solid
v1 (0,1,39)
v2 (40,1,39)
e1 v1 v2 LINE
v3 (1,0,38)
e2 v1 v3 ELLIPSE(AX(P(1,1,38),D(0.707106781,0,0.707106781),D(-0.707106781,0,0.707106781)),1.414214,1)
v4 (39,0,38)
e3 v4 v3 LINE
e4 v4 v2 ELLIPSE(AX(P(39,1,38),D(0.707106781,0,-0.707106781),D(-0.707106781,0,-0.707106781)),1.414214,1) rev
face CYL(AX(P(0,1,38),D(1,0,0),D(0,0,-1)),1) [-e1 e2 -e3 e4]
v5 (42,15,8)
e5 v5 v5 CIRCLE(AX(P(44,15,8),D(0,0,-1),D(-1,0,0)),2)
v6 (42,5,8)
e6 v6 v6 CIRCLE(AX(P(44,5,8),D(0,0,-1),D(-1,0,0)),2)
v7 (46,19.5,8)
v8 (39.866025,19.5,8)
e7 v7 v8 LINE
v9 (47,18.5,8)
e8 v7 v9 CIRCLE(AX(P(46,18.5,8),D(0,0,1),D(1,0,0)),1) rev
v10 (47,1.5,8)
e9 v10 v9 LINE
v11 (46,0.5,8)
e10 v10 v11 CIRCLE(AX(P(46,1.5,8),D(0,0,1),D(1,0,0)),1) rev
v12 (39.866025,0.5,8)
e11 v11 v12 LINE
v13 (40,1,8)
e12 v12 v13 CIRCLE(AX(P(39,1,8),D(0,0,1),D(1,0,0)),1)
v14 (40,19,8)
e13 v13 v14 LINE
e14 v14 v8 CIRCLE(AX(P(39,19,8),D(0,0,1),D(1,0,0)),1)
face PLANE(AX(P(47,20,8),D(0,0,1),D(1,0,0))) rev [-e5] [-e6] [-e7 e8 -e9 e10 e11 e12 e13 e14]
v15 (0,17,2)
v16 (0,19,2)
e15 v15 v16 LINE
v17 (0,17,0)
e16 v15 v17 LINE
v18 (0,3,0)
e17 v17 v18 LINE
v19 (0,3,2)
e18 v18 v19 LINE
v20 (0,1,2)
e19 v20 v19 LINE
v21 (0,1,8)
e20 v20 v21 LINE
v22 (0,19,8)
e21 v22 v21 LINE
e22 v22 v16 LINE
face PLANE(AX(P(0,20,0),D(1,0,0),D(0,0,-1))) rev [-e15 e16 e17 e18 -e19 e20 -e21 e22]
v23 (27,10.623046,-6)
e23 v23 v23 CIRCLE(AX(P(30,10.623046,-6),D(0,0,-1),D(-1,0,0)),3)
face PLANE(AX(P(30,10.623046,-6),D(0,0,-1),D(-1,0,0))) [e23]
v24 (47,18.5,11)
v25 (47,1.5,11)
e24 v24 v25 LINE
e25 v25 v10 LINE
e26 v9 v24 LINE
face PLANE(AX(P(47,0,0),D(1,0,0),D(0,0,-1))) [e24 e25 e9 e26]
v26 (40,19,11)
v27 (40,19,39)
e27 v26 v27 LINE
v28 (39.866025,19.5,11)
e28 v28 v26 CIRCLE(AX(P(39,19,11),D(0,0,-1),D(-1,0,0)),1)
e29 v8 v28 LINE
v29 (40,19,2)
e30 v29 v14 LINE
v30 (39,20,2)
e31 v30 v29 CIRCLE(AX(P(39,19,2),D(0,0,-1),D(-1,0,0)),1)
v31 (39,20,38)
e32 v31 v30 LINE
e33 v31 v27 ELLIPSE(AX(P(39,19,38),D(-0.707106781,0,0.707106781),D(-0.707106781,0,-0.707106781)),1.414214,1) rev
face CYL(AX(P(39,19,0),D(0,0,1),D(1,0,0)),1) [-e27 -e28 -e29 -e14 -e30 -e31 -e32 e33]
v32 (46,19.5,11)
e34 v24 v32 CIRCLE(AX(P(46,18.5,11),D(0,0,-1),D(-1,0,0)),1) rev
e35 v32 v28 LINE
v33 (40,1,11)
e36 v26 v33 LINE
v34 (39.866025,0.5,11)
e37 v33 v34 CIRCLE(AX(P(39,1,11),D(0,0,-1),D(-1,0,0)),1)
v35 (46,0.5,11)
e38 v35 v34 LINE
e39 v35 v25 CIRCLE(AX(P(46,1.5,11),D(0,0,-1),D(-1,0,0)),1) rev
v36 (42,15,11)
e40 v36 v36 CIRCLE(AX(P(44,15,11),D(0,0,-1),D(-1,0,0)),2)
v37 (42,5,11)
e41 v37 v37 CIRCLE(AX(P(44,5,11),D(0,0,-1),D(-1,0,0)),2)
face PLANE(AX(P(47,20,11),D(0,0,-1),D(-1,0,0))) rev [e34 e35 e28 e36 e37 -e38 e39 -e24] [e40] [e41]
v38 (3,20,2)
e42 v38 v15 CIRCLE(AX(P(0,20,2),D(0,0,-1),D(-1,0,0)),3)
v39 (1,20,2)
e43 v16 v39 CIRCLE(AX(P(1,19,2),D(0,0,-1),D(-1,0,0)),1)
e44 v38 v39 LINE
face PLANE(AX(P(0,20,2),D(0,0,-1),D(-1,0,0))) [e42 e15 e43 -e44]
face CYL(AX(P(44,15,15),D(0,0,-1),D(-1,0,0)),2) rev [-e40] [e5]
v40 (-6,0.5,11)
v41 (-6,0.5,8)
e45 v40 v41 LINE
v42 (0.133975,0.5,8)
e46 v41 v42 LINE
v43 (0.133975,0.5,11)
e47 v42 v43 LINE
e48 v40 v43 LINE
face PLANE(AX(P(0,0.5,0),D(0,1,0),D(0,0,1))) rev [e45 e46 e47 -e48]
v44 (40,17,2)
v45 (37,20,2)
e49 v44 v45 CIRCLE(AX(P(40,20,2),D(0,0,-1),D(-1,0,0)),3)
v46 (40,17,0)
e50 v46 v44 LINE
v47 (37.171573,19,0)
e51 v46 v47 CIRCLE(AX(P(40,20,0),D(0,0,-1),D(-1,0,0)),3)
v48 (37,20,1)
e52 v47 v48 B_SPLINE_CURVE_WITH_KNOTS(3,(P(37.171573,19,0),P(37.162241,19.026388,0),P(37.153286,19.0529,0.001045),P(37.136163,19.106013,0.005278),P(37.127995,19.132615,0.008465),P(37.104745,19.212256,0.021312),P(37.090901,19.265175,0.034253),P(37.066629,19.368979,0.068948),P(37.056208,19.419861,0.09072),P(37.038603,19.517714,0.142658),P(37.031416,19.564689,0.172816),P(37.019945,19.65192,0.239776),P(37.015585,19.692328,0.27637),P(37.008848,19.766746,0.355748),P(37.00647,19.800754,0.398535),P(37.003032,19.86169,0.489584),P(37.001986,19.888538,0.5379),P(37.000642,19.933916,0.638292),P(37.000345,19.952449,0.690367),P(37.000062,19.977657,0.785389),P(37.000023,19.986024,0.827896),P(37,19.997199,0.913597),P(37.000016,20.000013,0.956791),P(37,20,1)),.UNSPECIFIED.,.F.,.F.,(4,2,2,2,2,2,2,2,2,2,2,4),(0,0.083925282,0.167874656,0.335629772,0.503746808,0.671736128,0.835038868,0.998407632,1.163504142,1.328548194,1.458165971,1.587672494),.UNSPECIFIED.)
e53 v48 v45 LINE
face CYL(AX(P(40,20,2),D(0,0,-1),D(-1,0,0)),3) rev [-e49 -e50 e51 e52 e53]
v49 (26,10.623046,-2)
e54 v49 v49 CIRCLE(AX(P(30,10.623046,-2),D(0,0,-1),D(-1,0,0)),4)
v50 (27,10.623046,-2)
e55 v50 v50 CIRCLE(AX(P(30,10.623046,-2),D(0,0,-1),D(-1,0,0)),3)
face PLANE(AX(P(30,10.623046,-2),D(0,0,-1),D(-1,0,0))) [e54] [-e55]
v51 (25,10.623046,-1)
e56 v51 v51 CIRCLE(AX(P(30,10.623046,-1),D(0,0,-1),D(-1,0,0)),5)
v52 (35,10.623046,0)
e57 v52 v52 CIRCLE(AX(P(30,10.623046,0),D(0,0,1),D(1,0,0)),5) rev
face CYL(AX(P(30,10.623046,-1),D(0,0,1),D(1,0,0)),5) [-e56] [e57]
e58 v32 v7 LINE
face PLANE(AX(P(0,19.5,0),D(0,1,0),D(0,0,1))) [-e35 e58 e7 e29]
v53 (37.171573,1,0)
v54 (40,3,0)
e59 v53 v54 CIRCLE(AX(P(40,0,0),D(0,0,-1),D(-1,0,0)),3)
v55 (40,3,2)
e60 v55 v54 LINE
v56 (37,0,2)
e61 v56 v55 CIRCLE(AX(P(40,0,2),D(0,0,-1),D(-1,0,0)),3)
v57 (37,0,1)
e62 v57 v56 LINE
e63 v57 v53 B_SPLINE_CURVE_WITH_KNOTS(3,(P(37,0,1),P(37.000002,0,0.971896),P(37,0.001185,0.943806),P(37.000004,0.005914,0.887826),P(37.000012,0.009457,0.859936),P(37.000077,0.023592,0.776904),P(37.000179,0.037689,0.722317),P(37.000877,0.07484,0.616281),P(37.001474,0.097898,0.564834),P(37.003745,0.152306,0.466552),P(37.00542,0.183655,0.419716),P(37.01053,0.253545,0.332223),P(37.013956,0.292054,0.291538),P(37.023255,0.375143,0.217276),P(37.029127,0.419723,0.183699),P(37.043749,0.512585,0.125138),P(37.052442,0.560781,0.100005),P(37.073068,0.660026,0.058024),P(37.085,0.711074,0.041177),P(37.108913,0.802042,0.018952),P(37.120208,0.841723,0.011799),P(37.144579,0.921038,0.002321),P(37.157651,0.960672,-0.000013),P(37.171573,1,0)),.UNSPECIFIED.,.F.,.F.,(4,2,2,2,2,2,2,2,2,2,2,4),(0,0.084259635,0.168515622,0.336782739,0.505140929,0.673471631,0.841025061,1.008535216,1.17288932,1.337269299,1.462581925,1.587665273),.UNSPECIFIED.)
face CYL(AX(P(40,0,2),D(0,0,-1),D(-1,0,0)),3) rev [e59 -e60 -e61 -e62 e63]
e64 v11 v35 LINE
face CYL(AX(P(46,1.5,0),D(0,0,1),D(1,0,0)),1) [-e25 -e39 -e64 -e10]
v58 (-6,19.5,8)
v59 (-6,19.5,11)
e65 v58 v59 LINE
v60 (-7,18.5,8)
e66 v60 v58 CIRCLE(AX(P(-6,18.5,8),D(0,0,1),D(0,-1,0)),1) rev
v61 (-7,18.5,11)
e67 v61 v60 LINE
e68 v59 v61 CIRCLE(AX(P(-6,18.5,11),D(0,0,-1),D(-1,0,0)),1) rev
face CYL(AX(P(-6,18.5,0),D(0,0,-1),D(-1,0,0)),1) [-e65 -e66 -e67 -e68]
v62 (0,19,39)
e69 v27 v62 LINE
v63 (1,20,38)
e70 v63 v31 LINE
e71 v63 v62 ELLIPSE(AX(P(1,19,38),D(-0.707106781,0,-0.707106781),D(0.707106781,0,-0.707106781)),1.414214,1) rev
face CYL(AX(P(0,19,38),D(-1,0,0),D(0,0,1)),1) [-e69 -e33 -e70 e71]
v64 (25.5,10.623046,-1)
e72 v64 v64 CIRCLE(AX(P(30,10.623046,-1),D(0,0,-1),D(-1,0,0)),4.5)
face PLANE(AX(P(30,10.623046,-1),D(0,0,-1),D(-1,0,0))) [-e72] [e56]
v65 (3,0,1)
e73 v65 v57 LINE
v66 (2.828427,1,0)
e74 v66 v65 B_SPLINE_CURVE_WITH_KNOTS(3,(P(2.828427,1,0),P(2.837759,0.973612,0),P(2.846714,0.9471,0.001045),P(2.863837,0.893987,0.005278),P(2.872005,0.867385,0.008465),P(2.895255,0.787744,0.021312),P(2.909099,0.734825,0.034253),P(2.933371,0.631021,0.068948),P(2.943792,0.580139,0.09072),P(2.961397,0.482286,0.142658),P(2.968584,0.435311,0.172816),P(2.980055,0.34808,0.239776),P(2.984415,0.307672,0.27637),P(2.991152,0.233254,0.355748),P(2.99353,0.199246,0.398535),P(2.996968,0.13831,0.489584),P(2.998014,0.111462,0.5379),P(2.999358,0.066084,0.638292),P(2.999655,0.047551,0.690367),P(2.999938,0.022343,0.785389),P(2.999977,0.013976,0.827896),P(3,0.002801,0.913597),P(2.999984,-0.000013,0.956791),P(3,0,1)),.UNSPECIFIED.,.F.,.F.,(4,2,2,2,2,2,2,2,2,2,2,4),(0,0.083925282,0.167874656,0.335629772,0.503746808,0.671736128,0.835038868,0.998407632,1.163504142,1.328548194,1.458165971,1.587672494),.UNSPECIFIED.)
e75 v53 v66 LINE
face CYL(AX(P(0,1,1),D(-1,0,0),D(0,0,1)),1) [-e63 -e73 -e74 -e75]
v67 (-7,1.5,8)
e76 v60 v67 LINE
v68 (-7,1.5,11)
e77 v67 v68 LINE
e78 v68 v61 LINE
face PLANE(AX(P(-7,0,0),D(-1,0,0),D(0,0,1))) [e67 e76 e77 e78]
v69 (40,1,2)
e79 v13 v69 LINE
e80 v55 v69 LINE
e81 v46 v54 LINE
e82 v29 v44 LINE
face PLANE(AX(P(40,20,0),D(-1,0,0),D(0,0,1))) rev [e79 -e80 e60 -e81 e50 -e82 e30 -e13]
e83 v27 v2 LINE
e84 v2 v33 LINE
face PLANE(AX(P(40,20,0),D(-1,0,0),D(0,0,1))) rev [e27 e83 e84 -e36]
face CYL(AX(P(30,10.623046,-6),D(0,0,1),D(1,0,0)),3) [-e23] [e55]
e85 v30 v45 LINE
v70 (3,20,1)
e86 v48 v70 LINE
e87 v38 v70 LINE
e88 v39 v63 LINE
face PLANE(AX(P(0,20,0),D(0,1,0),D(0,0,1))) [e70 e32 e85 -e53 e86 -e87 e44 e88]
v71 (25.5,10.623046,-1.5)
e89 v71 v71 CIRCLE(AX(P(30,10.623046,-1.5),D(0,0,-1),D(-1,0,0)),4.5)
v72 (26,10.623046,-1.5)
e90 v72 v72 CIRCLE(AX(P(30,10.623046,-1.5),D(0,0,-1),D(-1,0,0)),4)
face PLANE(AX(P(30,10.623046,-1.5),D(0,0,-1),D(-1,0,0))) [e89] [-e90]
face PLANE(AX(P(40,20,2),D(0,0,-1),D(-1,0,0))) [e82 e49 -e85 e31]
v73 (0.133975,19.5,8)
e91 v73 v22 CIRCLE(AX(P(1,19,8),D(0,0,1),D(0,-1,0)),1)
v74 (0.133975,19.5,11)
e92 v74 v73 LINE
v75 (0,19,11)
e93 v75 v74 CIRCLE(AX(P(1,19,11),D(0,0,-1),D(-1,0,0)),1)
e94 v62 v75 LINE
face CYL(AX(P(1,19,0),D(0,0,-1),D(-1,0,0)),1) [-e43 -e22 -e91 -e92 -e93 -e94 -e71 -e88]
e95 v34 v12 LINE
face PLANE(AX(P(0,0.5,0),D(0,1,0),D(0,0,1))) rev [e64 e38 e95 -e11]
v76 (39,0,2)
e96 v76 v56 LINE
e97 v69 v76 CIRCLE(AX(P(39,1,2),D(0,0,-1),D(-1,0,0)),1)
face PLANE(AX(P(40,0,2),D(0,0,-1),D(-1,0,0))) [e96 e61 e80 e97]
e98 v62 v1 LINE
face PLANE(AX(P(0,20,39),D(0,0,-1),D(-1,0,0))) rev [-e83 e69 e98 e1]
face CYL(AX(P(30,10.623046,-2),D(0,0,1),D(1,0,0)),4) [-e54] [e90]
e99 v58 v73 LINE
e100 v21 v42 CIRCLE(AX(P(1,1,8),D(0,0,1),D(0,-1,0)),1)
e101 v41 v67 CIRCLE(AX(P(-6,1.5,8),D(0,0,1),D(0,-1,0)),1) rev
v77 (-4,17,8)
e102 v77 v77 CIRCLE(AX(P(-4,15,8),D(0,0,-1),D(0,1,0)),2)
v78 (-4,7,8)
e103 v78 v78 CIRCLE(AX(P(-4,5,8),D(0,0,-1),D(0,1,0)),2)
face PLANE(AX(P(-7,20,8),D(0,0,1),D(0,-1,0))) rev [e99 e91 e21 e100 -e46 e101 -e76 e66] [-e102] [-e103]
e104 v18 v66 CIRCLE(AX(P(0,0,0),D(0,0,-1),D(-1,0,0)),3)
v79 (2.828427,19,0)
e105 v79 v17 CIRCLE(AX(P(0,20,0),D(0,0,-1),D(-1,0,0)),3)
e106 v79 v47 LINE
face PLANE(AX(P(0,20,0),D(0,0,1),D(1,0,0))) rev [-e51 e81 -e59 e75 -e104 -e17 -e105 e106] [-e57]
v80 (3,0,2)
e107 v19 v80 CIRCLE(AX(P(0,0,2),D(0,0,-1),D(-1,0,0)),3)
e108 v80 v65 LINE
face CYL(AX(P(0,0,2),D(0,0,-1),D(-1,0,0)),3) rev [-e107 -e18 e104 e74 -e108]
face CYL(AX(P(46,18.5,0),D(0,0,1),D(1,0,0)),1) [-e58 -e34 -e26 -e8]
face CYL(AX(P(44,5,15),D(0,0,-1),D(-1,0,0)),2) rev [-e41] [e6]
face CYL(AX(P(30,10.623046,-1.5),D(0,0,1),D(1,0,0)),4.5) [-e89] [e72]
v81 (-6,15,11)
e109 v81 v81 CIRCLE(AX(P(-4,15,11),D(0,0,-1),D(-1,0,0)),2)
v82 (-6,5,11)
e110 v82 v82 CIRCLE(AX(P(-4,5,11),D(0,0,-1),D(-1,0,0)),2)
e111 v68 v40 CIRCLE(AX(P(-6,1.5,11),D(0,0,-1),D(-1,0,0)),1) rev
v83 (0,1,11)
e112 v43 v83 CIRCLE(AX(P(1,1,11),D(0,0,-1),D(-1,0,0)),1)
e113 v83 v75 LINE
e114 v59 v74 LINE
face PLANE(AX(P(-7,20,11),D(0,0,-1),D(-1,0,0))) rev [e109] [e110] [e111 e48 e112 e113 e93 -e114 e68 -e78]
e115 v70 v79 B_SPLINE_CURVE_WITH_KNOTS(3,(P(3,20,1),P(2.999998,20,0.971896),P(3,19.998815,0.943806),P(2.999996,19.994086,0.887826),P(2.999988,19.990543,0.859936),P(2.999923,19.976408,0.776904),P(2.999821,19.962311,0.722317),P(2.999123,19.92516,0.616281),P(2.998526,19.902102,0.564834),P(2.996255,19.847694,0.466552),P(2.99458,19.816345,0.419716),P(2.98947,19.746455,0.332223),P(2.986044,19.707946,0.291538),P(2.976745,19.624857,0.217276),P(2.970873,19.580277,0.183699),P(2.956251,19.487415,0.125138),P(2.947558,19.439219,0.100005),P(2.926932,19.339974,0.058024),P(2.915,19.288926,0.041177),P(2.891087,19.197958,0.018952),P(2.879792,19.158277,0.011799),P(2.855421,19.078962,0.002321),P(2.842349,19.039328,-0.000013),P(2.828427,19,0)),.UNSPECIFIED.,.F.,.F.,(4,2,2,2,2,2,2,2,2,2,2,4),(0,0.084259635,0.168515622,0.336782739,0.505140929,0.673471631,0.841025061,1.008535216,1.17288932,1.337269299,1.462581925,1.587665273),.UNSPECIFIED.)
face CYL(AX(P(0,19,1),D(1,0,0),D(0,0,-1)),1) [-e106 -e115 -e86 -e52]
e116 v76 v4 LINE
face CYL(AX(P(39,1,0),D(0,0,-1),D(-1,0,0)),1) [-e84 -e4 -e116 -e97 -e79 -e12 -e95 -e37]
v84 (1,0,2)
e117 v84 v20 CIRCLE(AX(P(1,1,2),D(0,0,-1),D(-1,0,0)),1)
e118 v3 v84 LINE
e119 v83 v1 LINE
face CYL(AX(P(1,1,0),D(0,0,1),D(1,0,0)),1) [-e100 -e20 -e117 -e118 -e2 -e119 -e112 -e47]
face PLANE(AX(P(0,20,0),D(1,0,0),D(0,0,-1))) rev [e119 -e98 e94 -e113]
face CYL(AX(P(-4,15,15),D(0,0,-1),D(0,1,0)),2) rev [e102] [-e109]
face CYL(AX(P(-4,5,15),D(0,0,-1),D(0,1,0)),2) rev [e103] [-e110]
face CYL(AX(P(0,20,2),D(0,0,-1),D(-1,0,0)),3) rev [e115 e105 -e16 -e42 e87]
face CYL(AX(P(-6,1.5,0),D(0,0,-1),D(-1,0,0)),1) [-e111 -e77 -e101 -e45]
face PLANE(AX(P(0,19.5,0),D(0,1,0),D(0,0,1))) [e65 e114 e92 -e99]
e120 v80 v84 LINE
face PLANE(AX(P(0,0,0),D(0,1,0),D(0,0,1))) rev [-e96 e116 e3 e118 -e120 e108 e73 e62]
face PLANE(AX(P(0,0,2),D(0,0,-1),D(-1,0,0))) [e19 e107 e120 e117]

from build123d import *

# Parameters (mm, degrees)
SKETCH_1_W               = 40
SKETCH_1_H               = 39
EXTRUDE_1_DEPTH          = 20
SKETCH_6_R               = 5
EXTRUDE_3_DEPTH          = 1
SKETCH_7_R               = 4.5
EXTRUDE_4_DEPTH          = 0.5
SKETCH_8_R               = 4
EXTRUDE_5_DEPTH          = 0.5
SKETCH_9_R               = 3
EXTRUDE_6_DEPTH          = 4
SKETCH_11_W              = 3
SKETCH_11_H              = 20
EXTRUDE_7_DEPTH          = 7
SKETCH_12_R              = 2
CUT_EXTRUDE_2_DEPTH      = 7
SKETCH_13_W              = 3
SKETCH_13_H              = 20
EXTRUDE_8_DEPTH          = 7
SKETCH_14_R              = 2
CUT_EXTRUDE_3_DEPTH      = 7
SKETCH_15_R              = 3
CUT_EXTRUDE_4_DEPTH      = 2
CUT_EXTRUDE_6_DEPTH      = 65.265076052
CUT_EXTRUDE_6_DEPTH_BACK = 0.5
CUT_EXTRUDE_7_DEPTH      = 65.265076052
CUT_EXTRUDE_7_DEPTH_BACK = 0.5
CUT_EXTRUDE_8_DEPTH      = 65.265076052
CUT_EXTRUDE_8_DEPTH_BACK = 0.5
CUT_EXTRUDE_9_DEPTH      = 65.265076052
CUT_EXTRUDE_9_DEPTH_BACK = 0.5
FILLET_3_R               = 1


with BuildPart() as part:
    # 草图1 → 凸台-拉伸1 (new body)
    with BuildSketch(Plane(origin=(0, 0, 0), x_dir=(1, 0, 0), z_dir=(0, 1, 0))):
        with Locations((20, -19.5)):
            Rectangle(SKETCH_1_W, SKETCH_1_H)
    extrude(amount=EXTRUDE_1_DEPTH)

    # 草图6 → 凸台-拉伸3 (add)
    with BuildSketch(Plane(origin=(0, 0, 0), x_dir=(-1, 0, 0), z_dir=(0, 0, -1))):
        with Locations(Location((-30, 10.62304624, 0), (0, 0, 180))):
            Circle(SKETCH_6_R)
    extrude(amount=EXTRUDE_3_DEPTH)

    # 草图7 → 凸台-拉伸4 (add)
    with BuildSketch(Plane(origin=(0, 0, -1), x_dir=(-1, 0, 0), z_dir=(0, 0, -1))):
        with Locations((-30, 10.62304624)):
            Circle(SKETCH_7_R)
    extrude(amount=EXTRUDE_4_DEPTH)

    # 草图8 → 凸台-拉伸5 (add)
    with BuildSketch(Plane(origin=(0, 0, -1.5), x_dir=(-1, 0, 0), z_dir=(0, 0, -1))):
        with Locations((-30, 10.62304624)):
            Circle(SKETCH_8_R)
    extrude(amount=EXTRUDE_5_DEPTH)

    # 草图9 → 凸台-拉伸6 (add)
    with BuildSketch(Plane(origin=(0, 0, -2), x_dir=(-1, 0, 0), z_dir=(0, 0, -1))):
        with Locations((-30, 10.62304624)):
            Circle(SKETCH_9_R)
    extrude(amount=EXTRUDE_6_DEPTH)

    # 草图11 → 凸台-拉伸7 (add)
    with BuildSketch(Plane(origin=(40, 0, 0), x_dir=(0, 0, -1), z_dir=(1, 0, 0))):
        with Locations((-9.5, 10)):
            Rectangle(SKETCH_11_W, SKETCH_11_H)
    extrude(amount=EXTRUDE_7_DEPTH)

    # 草图12 → 切除-拉伸2 (cut)
    with BuildSketch(Plane(origin=(0, 0, 8), x_dir=(-1, 0, 0), z_dir=(0, 0, -1))):
        with Locations((-44, 15)):
            Circle(SKETCH_12_R)
        with Locations((-44, 5)):
            Circle(SKETCH_12_R)
    extrude(amount=-CUT_EXTRUDE_2_DEPTH, mode=Mode.SUBTRACT)

    # 草图13 → 凸台-拉伸8 (add)
    with BuildSketch(Plane.ZY):
        with Locations((9.5, 10)):
            Rectangle(SKETCH_13_W, SKETCH_13_H)
    extrude(amount=EXTRUDE_8_DEPTH)

    # 草图14 → 切除-拉伸3 (cut)
    with BuildSketch(Plane(origin=(0, 0, 8), x_dir=(-1, 0, 0), z_dir=(0, 0, -1))):
        with Locations(Location((4, 15, 0), (0, 0, 90))):
            Circle(SKETCH_14_R)
        with Locations(Location((4, 5, 0), (0, 0, 90))):
            Circle(SKETCH_14_R)
    extrude(amount=-CUT_EXTRUDE_3_DEPTH, mode=Mode.SUBTRACT)

    # 草图15 → 切除-拉伸4 (cut)
    with BuildSketch(Plane(origin=(0, 0, 0), x_dir=(-1, 0, 0), z_dir=(0, 0, -1))):
        with Locations((-40, 20)):
            Circle(SKETCH_15_R)
        with Locations((0, 20)):
            Circle(SKETCH_15_R)
        Circle(SKETCH_15_R)
        with Locations((-40, 0)):
            Circle(SKETCH_15_R)
    extrude(amount=-CUT_EXTRUDE_4_DEPTH, mode=Mode.SUBTRACT)

    # 草图16 → 切除-拉伸6 (cut, two sides: drawn at the far end of the back side and taken through both)
    with BuildSketch(Plane(origin=(0, 20, 0), x_dir=(1, 0, 0), z_dir=(0, 1, 0)).offset(-CUT_EXTRUDE_6_DEPTH_BACK)):
        Polygon((0, 114.605506082), (0, -8), (0, -11), (0, -133.605506082), (-245.211012164, -133.605506082), (-245.211012164, 114.605506082), align=None)
    extrude(amount=CUT_EXTRUDE_6_DEPTH + CUT_EXTRUDE_6_DEPTH_BACK, mode=Mode.SUBTRACT)

    # 草图17 → 切除-拉伸7 (cut, two sides: drawn at the far end of the back side and taken through both)
    with BuildSketch(Plane(origin=(0, 20, 0), x_dir=(1, 0, 0), z_dir=(0, 1, 0)).offset(-CUT_EXTRUDE_7_DEPTH_BACK)):
        Polygon((40, 114.605506082), (40, -8), (40, -11), (40, -133.605506082), (285.211012164, -133.605506082), (285.211012164, 114.605506082), align=None)
    extrude(amount=CUT_EXTRUDE_7_DEPTH + CUT_EXTRUDE_7_DEPTH_BACK, mode=Mode.SUBTRACT)

    # 草图19 → 切除-拉伸8 (cut, two sides: drawn at the far end of the back side and taken through both)
    with BuildSketch(Plane.XZ.offset(-CUT_EXTRUDE_8_DEPTH_BACK)):
        Polygon((0, 133.605506082), (0, 11), (0, 8), (0, -114.605506082), (-245.211012164, -114.605506082), (-245.211012164, 133.605506082), align=None)
    extrude(amount=CUT_EXTRUDE_8_DEPTH + CUT_EXTRUDE_8_DEPTH_BACK, mode=Mode.SUBTRACT)

    # 草图20 → 切除-拉伸9 (cut, two sides: drawn at the far end of the back side and taken through both)
    with BuildSketch(Plane.XZ.offset(-CUT_EXTRUDE_9_DEPTH_BACK)):
        Polygon((40, 133.605506082), (40, 11), (40, 8), (40, -114.605506082), (285.211012164, -114.605506082), (285.211012164, 133.605506082), align=None)
    extrude(amount=CUT_EXTRUDE_9_DEPTH + CUT_EXTRUDE_9_DEPTH_BACK, mode=Mode.SUBTRACT)

    # 圆角3
    # the kernel refuses this fillet: 1 mm, written as the material it takes off along each edge
    with BuildSketch(Plane(origin=(42.5, 0, 39), x_dir=(0, 1, 0), z_dir=(-1, 0, 0))) as fillet_3_piece_1:
        with BuildLine():
            CenterArc((FILLET_3_R, FILLET_3_R), FILLET_3_R, 180, 90)
            Line((0, FILLET_3_R), (0, 0))
            Line((0, 0), (FILLET_3_R, 0))
        make_face()
    extrude(amount=45, mode=Mode.SUBTRACT)
    with BuildSketch(Plane(origin=(42.5, 20, 39), x_dir=(0, -1, 0), z_dir=(-1, 0, 0))) as fillet_3_piece_2:
        with BuildLine():
            CenterArc((FILLET_3_R, -FILLET_3_R), FILLET_3_R, 90, 90)
            Line((0, -FILLET_3_R), (0, 0))
            Line((0, 0), (FILLET_3_R, 0))
        make_face()
    extrude(amount=45, mode=Mode.SUBTRACT)
    with BuildSketch(Plane(origin=(0, 0, 41.5), x_dir=(0, 1, 0), z_dir=(0, 0, -1))) as fillet_3_piece_3_section:
        with BuildLine():
            CenterArc((FILLET_3_R, FILLET_3_R), FILLET_3_R, 180, 90)
            Line((0, FILLET_3_R), (0, 0))
            Line((0, 0), (FILLET_3_R, 0))
        make_face()
    fillet_3_piece_3 = extrude(amount=42, mode=Mode.PRIVATE)
    fillet_3_piece_3 = split(fillet_3_piece_3, bisect_by=Plane(origin=(0.024008382, 0.663250785, 11), z_dir=(0, 0, 1)), keep=Keep.TOP, mode=Mode.PRIVATE)
    fillet_3_piece_3 = split(fillet_3_piece_3, bisect_by=Plane(origin=(0.024008382, 0.5, 26.25), z_dir=(0, 1, 0)), keep=Keep.TOP, mode=Mode.PRIVATE)
    add(fillet_3_piece_3, mode=Mode.SUBTRACT)
    with BuildSketch(Plane(origin=(0, 0, 41.5), x_dir=(0, 1, 0), z_dir=(0, 0, -1))) as fillet_3_piece_4_section:
        with BuildLine():
            CenterArc((FILLET_3_R, FILLET_3_R), FILLET_3_R, 180, 90)
            Line((0, FILLET_3_R), (0, 0))
            Line((0, 0), (FILLET_3_R, 0))
        make_face()
    fillet_3_piece_4 = extrude(amount=42, mode=Mode.PRIVATE)
    fillet_3_piece_4 = split(fillet_3_piece_4, bisect_by=Plane(origin=(0.25512006, 0.164391764, 11), z_dir=(0, 0, 1)), keep=Keep.TOP, mode=Mode.PRIVATE)
    fillet_3_piece_4 = split(fillet_3_piece_4, bisect_by=Plane(origin=(0.25512006, 0.5, 26.25), z_dir=(0, -1, 0)), keep=Keep.TOP, mode=Mode.PRIVATE)
    add(fillet_3_piece_4, mode=Mode.SUBTRACT)
    with BuildSketch(Plane(origin=(0, 0, 41.5), x_dir=(0, 1, 0), z_dir=(0, 0, -1))) as fillet_3_piece_5_section:
        with BuildLine():
            CenterArc((FILLET_3_R, FILLET_3_R), FILLET_3_R, 180, 90)
            Line((0, FILLET_3_R), (0, 0))
            Line((0, 0), (FILLET_3_R, 0))
        make_face()
    fillet_3_piece_5 = extrude(amount=42, mode=Mode.PRIVATE)
    fillet_3_piece_5 = split(fillet_3_piece_5, bisect_by=Plane(origin=(0.25512006, 0.164391764, 11), z_dir=(0, 0, -1)), keep=Keep.TOP, mode=Mode.PRIVATE)
    fillet_3_piece_5 = split(fillet_3_piece_5, bisect_by=Plane(origin=(0.25512006, 0.5, 9.5), z_dir=(0, -1, 0)), keep=Keep.TOP, mode=Mode.PRIVATE)
    fillet_3_piece_5 = split(fillet_3_piece_5, bisect_by=Plane(origin=(0.25512006, 0.164391764, 8), z_dir=(0, 0, 1)), keep=Keep.TOP, mode=Mode.PRIVATE)
    add(fillet_3_piece_5, mode=Mode.SUBTRACT)
    with BuildSketch(Plane(origin=(0, 0, 41.5), x_dir=(0, 1, 0), z_dir=(0, 0, -1))) as fillet_3_piece_6_section:
        with BuildLine():
            CenterArc((FILLET_3_R, FILLET_3_R), FILLET_3_R, 180, 90)
            Line((0, FILLET_3_R), (0, 0))
            Line((0, 0), (FILLET_3_R, 0))
        make_face()
    fillet_3_piece_6 = extrude(amount=42, mode=Mode.PRIVATE)
    fillet_3_piece_6 = split(fillet_3_piece_6, bisect_by=Plane(origin=(0.024008382, 0.5, 3.75), z_dir=(0, 1, 0)), keep=Keep.TOP, mode=Mode.PRIVATE)
    fillet_3_piece_6 = split(fillet_3_piece_6, bisect_by=Plane(origin=(0.024008382, 0.663250785, 8), z_dir=(0, 0, -1)), keep=Keep.TOP, mode=Mode.PRIVATE)
    add(fillet_3_piece_6, mode=Mode.SUBTRACT)
    with BuildSketch(Plane(origin=(0, 0, 41.5), x_dir=(0, 1, 0), z_dir=(0, 0, -1))) as fillet_3_piece_7_section:
        with BuildLine():
            CenterArc((FILLET_3_R, FILLET_3_R), FILLET_3_R, 180, 90)
            Line((0, FILLET_3_R), (0, 0))
            Line((0, 0), (FILLET_3_R, 0))
        make_face()
    fillet_3_piece_7 = extrude(amount=42, mode=Mode.PRIVATE)
    fillet_3_piece_7 = split(fillet_3_piece_7, bisect_by=Plane(origin=(0.25512006, 0.5, 3.75), z_dir=(0, -1, 0)), keep=Keep.TOP, mode=Mode.PRIVATE)
    fillet_3_piece_7 = split(fillet_3_piece_7, bisect_by=Plane(origin=(0.25512006, 0.164391764, 8), z_dir=(0, 0, -1)), keep=Keep.TOP, mode=Mode.PRIVATE)
    add(fillet_3_piece_7, mode=Mode.SUBTRACT)
    with BuildSketch(Plane(origin=(-7, 0.5, 5.5), x_dir=(0, 1, 0), z_dir=(0, 0, 1)), Plane(origin=(47, 19.5, 13.5), x_dir=(-1, 0, 0), z_dir=(0, 0, -1))) as fillet_3_piece_8:
        with BuildLine():
            CenterArc((FILLET_3_R, -FILLET_3_R), FILLET_3_R, 90, 90)
            Line((0, -FILLET_3_R), (0, 0))
            Line((0, 0), (FILLET_3_R, 0))
        make_face()
    extrude(amount=8, mode=Mode.SUBTRACT)
    with BuildSketch(Plane(origin=(0.5, 0, 0), x_dir=(0, 1, 0), z_dir=(1, 0, 0))) as fillet_3_piece_9:
        with BuildLine():
            CenterArc((FILLET_3_R, FILLET_3_R), FILLET_3_R, 180, 90)
            Line((0, FILLET_3_R), (0, 0))
            Line((0, 0), (FILLET_3_R, 0))
        make_face()
    extrude(amount=39, mode=Mode.SUBTRACT)
    with BuildSketch(Plane(origin=(47, 0.5, 5.5), x_dir=(0, 1, 0), z_dir=(0, 0, 1)), Plane(origin=(-7, 19.5, 13.5), x_dir=(1, 0, 0), z_dir=(0, 0, -1))) as fillet_3_piece_10:
        with BuildLine():
            CenterArc((FILLET_3_R, FILLET_3_R), FILLET_3_R, 180, 90)
            Line((0, FILLET_3_R), (0, 0))
            Line((0, 0), (FILLET_3_R, 0))
        make_face()
    extrude(amount=8, mode=Mode.SUBTRACT)
    with BuildSketch(Plane(origin=(40, 0, -0.5), x_dir=(0, 1, 0), z_dir=(0, 0, 1))) as fillet_3_piece_11_section:
        with BuildLine():
            CenterArc((FILLET_3_R, FILLET_3_R), FILLET_3_R, 180, 90)
            Line((0, FILLET_3_R), (0, 0))
            Line((0, 0), (FILLET_3_R, 0))
        make_face()
    fillet_3_piece_11 = extrude(amount=42, mode=Mode.PRIVATE)
    fillet_3_piece_11 = split(fillet_3_piece_11, bisect_by=Plane(origin=(39.975991618, 0.663250785, 8), z_dir=(0, 0, -1)), keep=Keep.TOP, mode=Mode.PRIVATE)
    fillet_3_piece_11 = split(fillet_3_piece_11, bisect_by=Plane(origin=(39.975991618, 0.5, 3.75), z_dir=(0, 1, 0)), keep=Keep.TOP, mode=Mode.PRIVATE)
    add(fillet_3_piece_11, mode=Mode.SUBTRACT)
    with BuildSketch(Plane(origin=(40, 0, -0.5), x_dir=(0, 1, 0), z_dir=(0, 0, 1))) as fillet_3_piece_12_section:
        with BuildLine():
            CenterArc((FILLET_3_R, FILLET_3_R), FILLET_3_R, 180, 90)
            Line((0, FILLET_3_R), (0, 0))
            Line((0, 0), (FILLET_3_R, 0))
        make_face()
    fillet_3_piece_12 = extrude(amount=42, mode=Mode.PRIVATE)
    fillet_3_piece_12 = split(fillet_3_piece_12, bisect_by=Plane(origin=(39.74487994, 0.164391764, 8), z_dir=(0, 0, -1)), keep=Keep.TOP, mode=Mode.PRIVATE)
    fillet_3_piece_12 = split(fillet_3_piece_12, bisect_by=Plane(origin=(39.74487994, 0.5, 3.75), z_dir=(0, -1, 0)), keep=Keep.TOP, mode=Mode.PRIVATE)
    add(fillet_3_piece_12, mode=Mode.SUBTRACT)
    with BuildSketch(Plane(origin=(40, 0, -0.5), x_dir=(0, 1, 0), z_dir=(0, 0, 1))) as fillet_3_piece_13_section:
        with BuildLine():
            CenterArc((FILLET_3_R, FILLET_3_R), FILLET_3_R, 180, 90)
            Line((0, FILLET_3_R), (0, 0))
            Line((0, 0), (FILLET_3_R, 0))
        make_face()
    fillet_3_piece_13 = extrude(amount=42, mode=Mode.PRIVATE)
    fillet_3_piece_13 = split(fillet_3_piece_13, bisect_by=Plane(origin=(39.74487994, 0.164391764, 8), z_dir=(0, 0, 1)), keep=Keep.TOP, mode=Mode.PRIVATE)
    fillet_3_piece_13 = split(fillet_3_piece_13, bisect_by=Plane(origin=(39.74487994, 0.5, 9.5), z_dir=(0, -1, 0)), keep=Keep.TOP, mode=Mode.PRIVATE)
    fillet_3_piece_13 = split(fillet_3_piece_13, bisect_by=Plane(origin=(39.74487994, 0.164391764, 11), z_dir=(0, 0, -1)), keep=Keep.TOP, mode=Mode.PRIVATE)
    add(fillet_3_piece_13, mode=Mode.SUBTRACT)
    with BuildSketch(Plane(origin=(40, 0, -0.5), x_dir=(0, 1, 0), z_dir=(0, 0, 1))) as fillet_3_piece_14_section:
        with BuildLine():
            CenterArc((FILLET_3_R, FILLET_3_R), FILLET_3_R, 180, 90)
            Line((0, FILLET_3_R), (0, 0))
            Line((0, 0), (FILLET_3_R, 0))
        make_face()
    fillet_3_piece_14 = extrude(amount=42, mode=Mode.PRIVATE)
    fillet_3_piece_14 = split(fillet_3_piece_14, bisect_by=Plane(origin=(39.975991618, 0.5, 26.25), z_dir=(0, 1, 0)), keep=Keep.TOP, mode=Mode.PRIVATE)
    fillet_3_piece_14 = split(fillet_3_piece_14, bisect_by=Plane(origin=(39.975991618, 0.663250785, 11), z_dir=(0, 0, 1)), keep=Keep.TOP, mode=Mode.PRIVATE)
    add(fillet_3_piece_14, mode=Mode.SUBTRACT)
    with BuildSketch(Plane(origin=(40, 0, -0.5), x_dir=(0, 1, 0), z_dir=(0, 0, 1))) as fillet_3_piece_15_section:
        with BuildLine():
            CenterArc((FILLET_3_R, FILLET_3_R), FILLET_3_R, 180, 90)
            Line((0, FILLET_3_R), (0, 0))
            Line((0, 0), (FILLET_3_R, 0))
        make_face()
    fillet_3_piece_15 = extrude(amount=42, mode=Mode.PRIVATE)
    fillet_3_piece_15 = split(fillet_3_piece_15, bisect_by=Plane(origin=(39.74487994, 0.5, 26.25), z_dir=(0, -1, 0)), keep=Keep.TOP, mode=Mode.PRIVATE)
    fillet_3_piece_15 = split(fillet_3_piece_15, bisect_by=Plane(origin=(39.74487994, 0.164391764, 11), z_dir=(0, 0, 1)), keep=Keep.TOP, mode=Mode.PRIVATE)
    add(fillet_3_piece_15, mode=Mode.SUBTRACT)
    with BuildSketch(Plane(origin=(40, 20, -0.5), x_dir=(-1, 0, 0), z_dir=(0, 0, 1))) as fillet_3_piece_16_section:
        with BuildLine():
            CenterArc((FILLET_3_R, FILLET_3_R), FILLET_3_R, 180, 90)
            Line((0, FILLET_3_R), (0, 0))
            Line((0, 0), (FILLET_3_R, 0))
        make_face()
    fillet_3_piece_16 = extrude(amount=42, mode=Mode.PRIVATE)
    fillet_3_piece_16 = split(fillet_3_piece_16, bisect_by=Plane(origin=(39.74487994, 19.835608236, 8), z_dir=(0, 0, -1)), keep=Keep.TOP, mode=Mode.PRIVATE)
    fillet_3_piece_16 = split(fillet_3_piece_16, bisect_by=Plane(origin=(39.74487994, 19.5, 3.75), z_dir=(0, 1, 0)), keep=Keep.TOP, mode=Mode.PRIVATE)
    add(fillet_3_piece_16, mode=Mode.SUBTRACT)
    with BuildSketch(Plane(origin=(40, 20, -0.5), x_dir=(-1, 0, 0), z_dir=(0, 0, 1))) as fillet_3_piece_17_section:
        with BuildLine():
            CenterArc((FILLET_3_R, FILLET_3_R), FILLET_3_R, 180, 90)
            Line((0, FILLET_3_R), (0, 0))
            Line((0, 0), (FILLET_3_R, 0))
        make_face()
    fillet_3_piece_17 = extrude(amount=42, mode=Mode.PRIVATE)
    fillet_3_piece_17 = split(fillet_3_piece_17, bisect_by=Plane(origin=(39.975991618, 19.336749215, 8), z_dir=(0, 0, -1)), keep=Keep.TOP, mode=Mode.PRIVATE)
    fillet_3_piece_17 = split(fillet_3_piece_17, bisect_by=Plane(origin=(39.975991618, 19.5, 3.75), z_dir=(0, -1, 0)), keep=Keep.TOP, mode=Mode.PRIVATE)
    add(fillet_3_piece_17, mode=Mode.SUBTRACT)
    with BuildSketch(Plane(origin=(40, 20, -0.5), x_dir=(-1, 0, 0), z_dir=(0, 0, 1))) as fillet_3_piece_18_section:
        with BuildLine():
            CenterArc((FILLET_3_R, FILLET_3_R), FILLET_3_R, 180, 90)
            Line((0, FILLET_3_R), (0, 0))
            Line((0, 0), (FILLET_3_R, 0))
        make_face()
    fillet_3_piece_18 = extrude(amount=42, mode=Mode.PRIVATE)
    fillet_3_piece_18 = split(fillet_3_piece_18, bisect_by=Plane(origin=(39.74487994, 19.835608236, 8), z_dir=(0, 0, 1)), keep=Keep.TOP, mode=Mode.PRIVATE)
    fillet_3_piece_18 = split(fillet_3_piece_18, bisect_by=Plane(origin=(39.74487994, 19.835608236, 11), z_dir=(0, 0, -1)), keep=Keep.TOP, mode=Mode.PRIVATE)
    fillet_3_piece_18 = split(fillet_3_piece_18, bisect_by=Plane(origin=(39.74487994, 19.5, 9.5), z_dir=(0, 1, 0)), keep=Keep.TOP, mode=Mode.PRIVATE)
    add(fillet_3_piece_18, mode=Mode.SUBTRACT)
    with BuildSketch(Plane(origin=(40, 20, -0.5), x_dir=(-1, 0, 0), z_dir=(0, 0, 1))) as fillet_3_piece_19_section:
        with BuildLine():
            CenterArc((FILLET_3_R, FILLET_3_R), FILLET_3_R, 180, 90)
            Line((0, FILLET_3_R), (0, 0))
            Line((0, 0), (FILLET_3_R, 0))
        make_face()
    fillet_3_piece_19 = extrude(amount=42, mode=Mode.PRIVATE)
    fillet_3_piece_19 = split(fillet_3_piece_19, bisect_by=Plane(origin=(39.74487994, 19.835608236, 11), z_dir=(0, 0, 1)), keep=Keep.TOP, mode=Mode.PRIVATE)
    fillet_3_piece_19 = split(fillet_3_piece_19, bisect_by=Plane(origin=(39.74487994, 19.5, 26.25), z_dir=(0, 1, 0)), keep=Keep.TOP, mode=Mode.PRIVATE)
    add(fillet_3_piece_19, mode=Mode.SUBTRACT)
    with BuildSketch(Plane(origin=(40, 20, -0.5), x_dir=(-1, 0, 0), z_dir=(0, 0, 1))) as fillet_3_piece_20_section:
        with BuildLine():
            CenterArc((FILLET_3_R, FILLET_3_R), FILLET_3_R, 180, 90)
            Line((0, FILLET_3_R), (0, 0))
            Line((0, 0), (FILLET_3_R, 0))
        make_face()
    fillet_3_piece_20 = extrude(amount=42, mode=Mode.PRIVATE)
    fillet_3_piece_20 = split(fillet_3_piece_20, bisect_by=Plane(origin=(39.975991618, 19.336749215, 11), z_dir=(0, 0, 1)), keep=Keep.TOP, mode=Mode.PRIVATE)
    fillet_3_piece_20 = split(fillet_3_piece_20, bisect_by=Plane(origin=(39.975991618, 19.5, 26.25), z_dir=(0, -1, 0)), keep=Keep.TOP, mode=Mode.PRIVATE)
    add(fillet_3_piece_20, mode=Mode.SUBTRACT)
    with BuildSketch(Plane(origin=(0.5, 20, 0), x_dir=(0, -1, 0), z_dir=(1, 0, 0))) as fillet_3_piece_21:
        with BuildLine():
            CenterArc((FILLET_3_R, -FILLET_3_R), FILLET_3_R, 90, 90)
            Line((0, -FILLET_3_R), (0, 0))
            Line((0, 0), (FILLET_3_R, 0))
        make_face()
    extrude(amount=39, mode=Mode.SUBTRACT)
    with BuildSketch(Plane(origin=(0, 20, -0.5), x_dir=(0, -1, 0), z_dir=(0, 0, 1))) as fillet_3_piece_22_section:
        with BuildLine():
            CenterArc((FILLET_3_R, FILLET_3_R), FILLET_3_R, 180, 90)
            Line((0, FILLET_3_R), (0, 0))
            Line((0, 0), (FILLET_3_R, 0))
        make_face()
    fillet_3_piece_22 = extrude(amount=42, mode=Mode.PRIVATE)
    fillet_3_piece_22 = split(fillet_3_piece_22, bisect_by=Plane(origin=(0.024008382, 19.336749215, 8), z_dir=(0, 0, -1)), keep=Keep.TOP, mode=Mode.PRIVATE)
    fillet_3_piece_22 = split(fillet_3_piece_22, bisect_by=Plane(origin=(0.024008382, 19.5, 3.75), z_dir=(0, -1, 0)), keep=Keep.TOP, mode=Mode.PRIVATE)
    add(fillet_3_piece_22, mode=Mode.SUBTRACT)
    with BuildSketch(Plane(origin=(0, 20, -0.5), x_dir=(0, -1, 0), z_dir=(0, 0, 1))) as fillet_3_piece_23_section:
        with BuildLine():
            CenterArc((FILLET_3_R, FILLET_3_R), FILLET_3_R, 180, 90)
            Line((0, FILLET_3_R), (0, 0))
            Line((0, 0), (FILLET_3_R, 0))
        make_face()
    fillet_3_piece_23 = extrude(amount=42, mode=Mode.PRIVATE)
    fillet_3_piece_23 = split(fillet_3_piece_23, bisect_by=Plane(origin=(0.25512006, 19.835608236, 8), z_dir=(0, 0, -1)), keep=Keep.TOP, mode=Mode.PRIVATE)
    fillet_3_piece_23 = split(fillet_3_piece_23, bisect_by=Plane(origin=(0.25512006, 19.5, 3.75), z_dir=(0, 1, 0)), keep=Keep.TOP, mode=Mode.PRIVATE)
    add(fillet_3_piece_23, mode=Mode.SUBTRACT)
    with BuildSketch(Plane(origin=(0, 20, -0.5), x_dir=(0, -1, 0), z_dir=(0, 0, 1))) as fillet_3_piece_24_section:
        with BuildLine():
            CenterArc((FILLET_3_R, FILLET_3_R), FILLET_3_R, 180, 90)
            Line((0, FILLET_3_R), (0, 0))
            Line((0, 0), (FILLET_3_R, 0))
        make_face()
    fillet_3_piece_24 = extrude(amount=42, mode=Mode.PRIVATE)
    fillet_3_piece_24 = split(fillet_3_piece_24, bisect_by=Plane(origin=(0.25512006, 19.835608236, 11), z_dir=(0, 0, -1)), keep=Keep.TOP, mode=Mode.PRIVATE)
    fillet_3_piece_24 = split(fillet_3_piece_24, bisect_by=Plane(origin=(0.25512006, 19.835608236, 8), z_dir=(0, 0, 1)), keep=Keep.TOP, mode=Mode.PRIVATE)
    fillet_3_piece_24 = split(fillet_3_piece_24, bisect_by=Plane(origin=(0.25512006, 19.5, 9.5), z_dir=(0, 1, 0)), keep=Keep.TOP, mode=Mode.PRIVATE)
    add(fillet_3_piece_24, mode=Mode.SUBTRACT)
    with BuildSketch(Plane(origin=(0, 20, -0.5), x_dir=(0, -1, 0), z_dir=(0, 0, 1))) as fillet_3_piece_25_section:
        with BuildLine():
            CenterArc((FILLET_3_R, FILLET_3_R), FILLET_3_R, 180, 90)
            Line((0, FILLET_3_R), (0, 0))
            Line((0, 0), (FILLET_3_R, 0))
        make_face()
    fillet_3_piece_25 = extrude(amount=42, mode=Mode.PRIVATE)
    fillet_3_piece_25 = split(fillet_3_piece_25, bisect_by=Plane(origin=(0.024008382, 19.336749215, 11), z_dir=(0, 0, 1)), keep=Keep.TOP, mode=Mode.PRIVATE)
    fillet_3_piece_25 = split(fillet_3_piece_25, bisect_by=Plane(origin=(0.024008382, 19.5, 26.25), z_dir=(0, -1, 0)), keep=Keep.TOP, mode=Mode.PRIVATE)
    add(fillet_3_piece_25, mode=Mode.SUBTRACT)
    with BuildSketch(Plane(origin=(0, 20, -0.5), x_dir=(0, -1, 0), z_dir=(0, 0, 1))) as fillet_3_piece_26_section:
        with BuildLine():
            CenterArc((FILLET_3_R, FILLET_3_R), FILLET_3_R, 180, 90)
            Line((0, FILLET_3_R), (0, 0))
            Line((0, 0), (FILLET_3_R, 0))
        make_face()
    fillet_3_piece_26 = extrude(amount=42, mode=Mode.PRIVATE)
    fillet_3_piece_26 = split(fillet_3_piece_26, bisect_by=Plane(origin=(0.25512006, 19.835608236, 11), z_dir=(0, 0, 1)), keep=Keep.TOP, mode=Mode.PRIVATE)
    fillet_3_piece_26 = split(fillet_3_piece_26, bisect_by=Plane(origin=(0.25512006, 19.5, 26.25), z_dir=(0, 1, 0)), keep=Keep.TOP, mode=Mode.PRIVATE)
    add(fillet_3_piece_26, mode=Mode.SUBTRACT)


solid = part.part
